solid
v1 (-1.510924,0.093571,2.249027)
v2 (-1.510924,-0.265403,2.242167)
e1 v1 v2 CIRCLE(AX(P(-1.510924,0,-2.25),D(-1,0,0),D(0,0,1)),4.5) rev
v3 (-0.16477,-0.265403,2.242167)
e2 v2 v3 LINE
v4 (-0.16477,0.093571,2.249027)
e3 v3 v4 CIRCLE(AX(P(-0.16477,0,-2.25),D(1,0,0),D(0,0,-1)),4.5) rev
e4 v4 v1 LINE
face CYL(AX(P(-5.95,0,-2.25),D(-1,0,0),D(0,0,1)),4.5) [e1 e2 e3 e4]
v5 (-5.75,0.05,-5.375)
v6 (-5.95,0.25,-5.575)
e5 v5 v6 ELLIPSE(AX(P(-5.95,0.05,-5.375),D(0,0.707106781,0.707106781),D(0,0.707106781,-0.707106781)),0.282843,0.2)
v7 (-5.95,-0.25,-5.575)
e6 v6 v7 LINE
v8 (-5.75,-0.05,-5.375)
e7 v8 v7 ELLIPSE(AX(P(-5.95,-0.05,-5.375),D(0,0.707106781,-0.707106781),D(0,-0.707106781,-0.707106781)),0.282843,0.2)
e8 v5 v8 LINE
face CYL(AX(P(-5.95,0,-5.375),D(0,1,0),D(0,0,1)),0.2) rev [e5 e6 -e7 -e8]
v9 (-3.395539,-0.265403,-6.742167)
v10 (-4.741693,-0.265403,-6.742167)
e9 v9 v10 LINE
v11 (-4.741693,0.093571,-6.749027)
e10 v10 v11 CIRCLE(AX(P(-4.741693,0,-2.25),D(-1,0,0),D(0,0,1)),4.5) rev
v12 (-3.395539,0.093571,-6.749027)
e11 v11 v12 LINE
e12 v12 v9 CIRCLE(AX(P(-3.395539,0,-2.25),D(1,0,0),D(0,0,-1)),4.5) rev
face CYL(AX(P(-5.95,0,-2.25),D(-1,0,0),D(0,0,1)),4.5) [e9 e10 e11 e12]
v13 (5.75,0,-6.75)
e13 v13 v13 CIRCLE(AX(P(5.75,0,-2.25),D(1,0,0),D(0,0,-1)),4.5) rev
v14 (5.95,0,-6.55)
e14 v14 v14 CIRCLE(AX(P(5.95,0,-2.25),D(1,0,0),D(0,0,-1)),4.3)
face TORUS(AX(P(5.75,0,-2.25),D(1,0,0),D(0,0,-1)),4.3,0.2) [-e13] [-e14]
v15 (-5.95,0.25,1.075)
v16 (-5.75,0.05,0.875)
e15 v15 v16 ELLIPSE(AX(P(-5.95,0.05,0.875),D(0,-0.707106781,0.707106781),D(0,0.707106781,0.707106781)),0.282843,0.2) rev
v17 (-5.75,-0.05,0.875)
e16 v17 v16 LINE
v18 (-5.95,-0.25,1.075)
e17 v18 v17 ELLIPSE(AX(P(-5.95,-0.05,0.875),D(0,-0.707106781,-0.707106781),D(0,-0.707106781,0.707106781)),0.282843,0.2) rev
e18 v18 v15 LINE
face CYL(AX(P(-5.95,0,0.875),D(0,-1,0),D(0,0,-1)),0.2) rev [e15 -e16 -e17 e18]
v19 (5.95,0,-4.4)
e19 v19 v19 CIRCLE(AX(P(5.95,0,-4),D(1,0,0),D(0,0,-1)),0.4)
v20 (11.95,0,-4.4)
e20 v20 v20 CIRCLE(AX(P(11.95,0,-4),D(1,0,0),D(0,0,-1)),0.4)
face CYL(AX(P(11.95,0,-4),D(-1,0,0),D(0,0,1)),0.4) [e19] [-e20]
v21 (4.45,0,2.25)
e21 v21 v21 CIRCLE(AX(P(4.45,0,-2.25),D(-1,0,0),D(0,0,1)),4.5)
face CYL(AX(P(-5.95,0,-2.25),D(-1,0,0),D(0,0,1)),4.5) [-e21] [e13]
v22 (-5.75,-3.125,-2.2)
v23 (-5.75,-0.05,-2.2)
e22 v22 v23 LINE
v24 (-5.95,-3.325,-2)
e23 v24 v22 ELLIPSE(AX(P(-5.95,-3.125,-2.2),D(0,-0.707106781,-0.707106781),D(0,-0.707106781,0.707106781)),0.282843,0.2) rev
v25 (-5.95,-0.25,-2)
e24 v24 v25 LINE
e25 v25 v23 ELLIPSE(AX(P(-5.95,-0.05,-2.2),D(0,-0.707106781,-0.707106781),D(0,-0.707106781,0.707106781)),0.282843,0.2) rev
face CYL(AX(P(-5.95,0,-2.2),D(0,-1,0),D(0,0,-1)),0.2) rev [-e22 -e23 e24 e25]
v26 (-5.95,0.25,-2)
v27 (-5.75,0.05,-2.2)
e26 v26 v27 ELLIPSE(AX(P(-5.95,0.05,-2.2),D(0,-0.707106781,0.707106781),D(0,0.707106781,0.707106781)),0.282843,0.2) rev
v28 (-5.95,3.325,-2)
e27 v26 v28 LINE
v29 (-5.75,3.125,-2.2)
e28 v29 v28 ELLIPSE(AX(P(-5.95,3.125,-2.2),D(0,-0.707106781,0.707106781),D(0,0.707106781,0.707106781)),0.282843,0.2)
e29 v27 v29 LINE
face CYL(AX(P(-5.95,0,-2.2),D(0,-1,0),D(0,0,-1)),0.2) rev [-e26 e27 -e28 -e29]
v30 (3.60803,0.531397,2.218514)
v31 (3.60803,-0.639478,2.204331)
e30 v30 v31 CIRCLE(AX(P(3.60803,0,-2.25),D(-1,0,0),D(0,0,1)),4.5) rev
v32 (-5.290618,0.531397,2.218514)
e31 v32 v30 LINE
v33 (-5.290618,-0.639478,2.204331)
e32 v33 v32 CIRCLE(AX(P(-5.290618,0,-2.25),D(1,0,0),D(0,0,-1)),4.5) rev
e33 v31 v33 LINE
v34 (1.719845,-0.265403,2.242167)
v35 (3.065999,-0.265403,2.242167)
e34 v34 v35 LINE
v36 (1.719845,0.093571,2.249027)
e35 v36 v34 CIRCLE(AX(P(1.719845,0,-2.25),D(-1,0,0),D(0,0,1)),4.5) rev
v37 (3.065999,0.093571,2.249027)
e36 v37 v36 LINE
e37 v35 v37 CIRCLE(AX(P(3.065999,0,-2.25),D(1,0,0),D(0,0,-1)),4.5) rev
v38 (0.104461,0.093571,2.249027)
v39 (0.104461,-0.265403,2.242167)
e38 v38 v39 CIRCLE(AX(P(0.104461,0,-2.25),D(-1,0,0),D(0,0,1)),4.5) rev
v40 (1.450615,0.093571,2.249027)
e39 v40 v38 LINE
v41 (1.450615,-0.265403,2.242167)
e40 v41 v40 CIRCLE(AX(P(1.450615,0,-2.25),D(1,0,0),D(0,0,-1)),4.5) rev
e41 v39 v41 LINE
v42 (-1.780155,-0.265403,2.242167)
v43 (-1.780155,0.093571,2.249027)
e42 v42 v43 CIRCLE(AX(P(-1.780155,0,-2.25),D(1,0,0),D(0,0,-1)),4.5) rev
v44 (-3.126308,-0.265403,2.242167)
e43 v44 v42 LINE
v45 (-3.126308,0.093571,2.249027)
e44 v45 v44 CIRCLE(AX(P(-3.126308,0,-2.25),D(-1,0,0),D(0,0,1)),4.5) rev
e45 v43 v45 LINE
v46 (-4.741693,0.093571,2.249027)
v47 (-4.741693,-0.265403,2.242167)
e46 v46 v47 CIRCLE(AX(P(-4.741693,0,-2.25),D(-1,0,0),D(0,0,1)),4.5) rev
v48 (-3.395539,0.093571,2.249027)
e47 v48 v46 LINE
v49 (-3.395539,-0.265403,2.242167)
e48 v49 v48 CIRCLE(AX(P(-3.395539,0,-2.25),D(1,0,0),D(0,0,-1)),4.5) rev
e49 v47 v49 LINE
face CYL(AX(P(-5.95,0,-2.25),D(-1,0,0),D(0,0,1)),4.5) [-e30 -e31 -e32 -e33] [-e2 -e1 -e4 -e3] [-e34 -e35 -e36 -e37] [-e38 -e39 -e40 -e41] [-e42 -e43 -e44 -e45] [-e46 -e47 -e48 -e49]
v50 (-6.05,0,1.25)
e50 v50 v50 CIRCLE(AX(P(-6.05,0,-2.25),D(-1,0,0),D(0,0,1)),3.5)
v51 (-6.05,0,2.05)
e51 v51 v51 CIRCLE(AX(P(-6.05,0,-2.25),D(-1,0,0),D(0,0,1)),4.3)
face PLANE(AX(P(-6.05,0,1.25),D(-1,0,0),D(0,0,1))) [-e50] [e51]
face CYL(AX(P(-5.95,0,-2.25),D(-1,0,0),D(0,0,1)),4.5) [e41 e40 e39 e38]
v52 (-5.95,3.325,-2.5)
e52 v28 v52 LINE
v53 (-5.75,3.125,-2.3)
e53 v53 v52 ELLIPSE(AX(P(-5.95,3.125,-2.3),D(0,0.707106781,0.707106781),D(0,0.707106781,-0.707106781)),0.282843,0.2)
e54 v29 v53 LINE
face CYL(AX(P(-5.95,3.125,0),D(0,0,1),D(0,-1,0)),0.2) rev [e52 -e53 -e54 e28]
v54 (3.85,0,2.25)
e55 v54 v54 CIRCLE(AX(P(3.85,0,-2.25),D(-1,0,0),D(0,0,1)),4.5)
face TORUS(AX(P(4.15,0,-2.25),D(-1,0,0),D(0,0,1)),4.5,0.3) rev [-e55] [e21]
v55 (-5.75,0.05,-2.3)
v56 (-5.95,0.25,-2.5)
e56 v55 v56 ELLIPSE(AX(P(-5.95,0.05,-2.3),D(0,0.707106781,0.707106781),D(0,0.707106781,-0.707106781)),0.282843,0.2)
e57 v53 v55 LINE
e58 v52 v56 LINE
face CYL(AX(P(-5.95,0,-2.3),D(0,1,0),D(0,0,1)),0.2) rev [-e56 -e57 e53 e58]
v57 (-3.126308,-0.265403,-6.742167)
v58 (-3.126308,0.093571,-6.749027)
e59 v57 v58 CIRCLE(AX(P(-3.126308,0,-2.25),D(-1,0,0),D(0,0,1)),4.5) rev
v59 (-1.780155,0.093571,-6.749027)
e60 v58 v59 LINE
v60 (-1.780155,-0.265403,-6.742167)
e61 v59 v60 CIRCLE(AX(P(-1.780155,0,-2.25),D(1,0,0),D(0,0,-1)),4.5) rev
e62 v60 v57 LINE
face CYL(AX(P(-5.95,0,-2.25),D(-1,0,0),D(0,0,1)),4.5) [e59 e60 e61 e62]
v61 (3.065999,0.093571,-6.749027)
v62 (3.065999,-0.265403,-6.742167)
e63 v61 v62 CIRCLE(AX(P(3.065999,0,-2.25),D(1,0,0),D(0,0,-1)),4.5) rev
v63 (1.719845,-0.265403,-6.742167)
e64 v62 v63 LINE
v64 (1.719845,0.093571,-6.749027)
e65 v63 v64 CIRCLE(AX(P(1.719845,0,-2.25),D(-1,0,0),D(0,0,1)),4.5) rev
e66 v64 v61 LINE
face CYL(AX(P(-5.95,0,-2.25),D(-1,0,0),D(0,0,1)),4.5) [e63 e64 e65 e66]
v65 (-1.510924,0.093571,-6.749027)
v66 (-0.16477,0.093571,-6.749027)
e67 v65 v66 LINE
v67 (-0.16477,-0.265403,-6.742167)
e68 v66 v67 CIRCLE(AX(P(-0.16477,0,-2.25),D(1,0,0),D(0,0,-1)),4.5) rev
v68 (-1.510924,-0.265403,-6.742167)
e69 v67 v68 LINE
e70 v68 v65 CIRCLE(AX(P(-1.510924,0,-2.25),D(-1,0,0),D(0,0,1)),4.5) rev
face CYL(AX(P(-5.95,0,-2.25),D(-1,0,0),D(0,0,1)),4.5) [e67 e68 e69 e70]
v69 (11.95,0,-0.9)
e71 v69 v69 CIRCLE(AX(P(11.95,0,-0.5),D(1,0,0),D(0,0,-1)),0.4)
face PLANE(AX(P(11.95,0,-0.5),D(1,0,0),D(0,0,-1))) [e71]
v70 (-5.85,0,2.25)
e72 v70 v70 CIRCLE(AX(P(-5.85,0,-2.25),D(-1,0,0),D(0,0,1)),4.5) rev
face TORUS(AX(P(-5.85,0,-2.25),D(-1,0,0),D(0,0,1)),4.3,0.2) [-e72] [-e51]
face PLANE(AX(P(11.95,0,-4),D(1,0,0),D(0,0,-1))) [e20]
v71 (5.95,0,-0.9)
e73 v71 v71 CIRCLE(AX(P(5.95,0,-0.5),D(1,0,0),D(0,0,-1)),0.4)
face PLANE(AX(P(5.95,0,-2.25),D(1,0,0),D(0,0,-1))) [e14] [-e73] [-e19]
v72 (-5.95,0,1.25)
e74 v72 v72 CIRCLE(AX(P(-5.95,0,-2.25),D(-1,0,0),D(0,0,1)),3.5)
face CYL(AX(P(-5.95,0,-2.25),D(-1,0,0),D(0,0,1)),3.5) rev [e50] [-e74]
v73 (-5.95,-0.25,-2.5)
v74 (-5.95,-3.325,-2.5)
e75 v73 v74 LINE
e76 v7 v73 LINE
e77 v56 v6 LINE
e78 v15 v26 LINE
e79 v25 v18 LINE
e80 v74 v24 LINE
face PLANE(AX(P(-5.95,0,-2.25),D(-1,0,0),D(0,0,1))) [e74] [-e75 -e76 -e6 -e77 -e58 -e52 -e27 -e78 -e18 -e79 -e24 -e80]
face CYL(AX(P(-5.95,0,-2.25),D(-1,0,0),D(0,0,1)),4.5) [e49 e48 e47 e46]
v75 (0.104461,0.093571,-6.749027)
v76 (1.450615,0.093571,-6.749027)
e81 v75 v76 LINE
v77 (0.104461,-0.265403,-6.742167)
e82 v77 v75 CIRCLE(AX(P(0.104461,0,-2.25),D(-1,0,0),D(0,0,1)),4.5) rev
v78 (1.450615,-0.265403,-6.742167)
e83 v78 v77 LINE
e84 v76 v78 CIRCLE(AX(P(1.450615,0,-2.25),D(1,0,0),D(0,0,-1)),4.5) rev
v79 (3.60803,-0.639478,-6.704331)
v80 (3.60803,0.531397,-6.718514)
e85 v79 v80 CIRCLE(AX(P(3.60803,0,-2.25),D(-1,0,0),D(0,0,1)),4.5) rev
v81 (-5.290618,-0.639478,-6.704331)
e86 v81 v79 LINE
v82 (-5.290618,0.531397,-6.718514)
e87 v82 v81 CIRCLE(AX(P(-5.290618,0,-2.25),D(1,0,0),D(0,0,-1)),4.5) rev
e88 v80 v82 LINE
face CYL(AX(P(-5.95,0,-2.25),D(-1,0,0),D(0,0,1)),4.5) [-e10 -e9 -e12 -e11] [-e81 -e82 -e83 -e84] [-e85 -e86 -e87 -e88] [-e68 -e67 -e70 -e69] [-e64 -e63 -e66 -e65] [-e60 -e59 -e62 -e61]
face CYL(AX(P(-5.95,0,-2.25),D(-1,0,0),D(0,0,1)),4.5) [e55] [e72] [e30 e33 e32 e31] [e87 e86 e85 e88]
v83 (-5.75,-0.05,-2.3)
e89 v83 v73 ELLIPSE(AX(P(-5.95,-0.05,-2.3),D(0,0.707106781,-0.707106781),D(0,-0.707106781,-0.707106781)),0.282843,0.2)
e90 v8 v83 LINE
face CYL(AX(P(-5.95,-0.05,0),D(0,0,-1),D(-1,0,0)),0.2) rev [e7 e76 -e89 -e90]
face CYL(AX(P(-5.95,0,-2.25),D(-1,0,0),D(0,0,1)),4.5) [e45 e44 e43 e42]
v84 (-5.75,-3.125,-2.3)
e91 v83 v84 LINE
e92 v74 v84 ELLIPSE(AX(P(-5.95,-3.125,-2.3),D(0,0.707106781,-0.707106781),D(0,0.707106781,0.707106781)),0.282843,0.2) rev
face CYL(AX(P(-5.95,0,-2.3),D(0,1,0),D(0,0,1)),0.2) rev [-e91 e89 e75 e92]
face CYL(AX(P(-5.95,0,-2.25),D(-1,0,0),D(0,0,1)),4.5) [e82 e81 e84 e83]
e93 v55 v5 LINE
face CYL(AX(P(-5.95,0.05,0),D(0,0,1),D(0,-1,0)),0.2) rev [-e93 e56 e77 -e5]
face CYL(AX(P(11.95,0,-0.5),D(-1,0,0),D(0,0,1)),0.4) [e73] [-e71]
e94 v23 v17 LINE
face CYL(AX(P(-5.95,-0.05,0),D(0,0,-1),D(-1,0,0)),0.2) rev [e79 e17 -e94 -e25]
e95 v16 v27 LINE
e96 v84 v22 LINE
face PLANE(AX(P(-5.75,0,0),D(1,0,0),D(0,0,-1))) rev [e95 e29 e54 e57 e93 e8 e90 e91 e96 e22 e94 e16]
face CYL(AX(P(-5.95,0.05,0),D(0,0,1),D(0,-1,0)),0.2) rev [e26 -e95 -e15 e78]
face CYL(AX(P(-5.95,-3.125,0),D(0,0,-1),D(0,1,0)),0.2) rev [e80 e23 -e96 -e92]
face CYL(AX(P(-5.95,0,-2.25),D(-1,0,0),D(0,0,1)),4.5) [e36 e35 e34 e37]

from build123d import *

# Parameters (mm, degrees)
SKETCH6_R           = 0.4
BOSS_EXTRUDE1_DEPTH = 6
CUT_EXTRUDE1_DEPTH  = 0.2
FILLET2_R           = 0.2


with BuildPart() as part:
    # Sketch1 → Revolve1 (revolve)
    with BuildSketch(Plane(origin=(0, 0, 0), x_dir=(1, 0, 0), z_dir=(0, 1, 0))):
        with BuildLine():
            Line((-5.95, -1.25), (-6.05, -1.25))
            Line((-6.05, -1.25), (-6.05, -2.25))
            Line((-6.05, -2.25), (-5.95, -2.25))
            Line((-5.95, -2.25), (3.85, -2.25))
            ThreePointArc((3.85, -2.25), (4.15, -1.95), (4.45, -2.25))
            Line((4.45, -2.25), (5.95, -2.25))
            Line((5.95, -2.25), (5.95, 2.25))
            Line((5.95, 2.25), (-5.95, 2.25))
            Line((-5.95, 2.25), (-5.95, -1.25))
        make_face()
    revolve(axis=Axis((-5.95, 0, -2.25), (1, 0, 0)))

    # Sketch6 → Boss-Extrude1 (add)
    with BuildSketch(Plane(origin=(5.95, 0, 0), x_dir=(0, 0, -1), z_dir=(1, 0, 0))):
        with Locations((0.5, 0)):
            Circle(SKETCH6_R)
        with Locations((4, 0)):
            Circle(SKETCH6_R)
    extrude(amount=BOSS_EXTRUDE1_DEPTH)

    # Sketch8 → Cut-Extrude1 (cut)
    with BuildSketch(Plane.ZY.offset(5.95)):
        Polygon((-2, -0.25), (-2, -3.325), (-2.5, -3.325), (-2.5, -0.25), (-5.575, -0.25), (-5.575, 0.25), (-2.5, 0.25), (-2.5, 3.325), (-2, 3.325), (-2, 0.25), (1.075, 0.25), (1.075, -0.25), align=None)
    extrude(amount=-CUT_EXTRUDE1_DEPTH, mode=Mode.SUBTRACT)

    # Fillet2
    fillet2_edges = [part.edges().sort_by_distance(p)[0] for p in [
        (-5.75, -3.325, -2.25),
        (-5.75, -1.7875, -2.5),
        (-5.75, -0.25, -4.0375),
        (-5.75, 0, -5.575),
        (-5.75, 0.25, -4.0375),
        (-5.75, 1.7875, -2.5),
        (-5.75, 3.325, -2.25),
        (-5.75, 1.7875, -2),
        (-5.75, 0.25, -0.4625),
        (-5.75, 0, 1.075),
        (-5.75, -0.25, -0.4625),
        (-5.75, -1.7875, -2),
        (5.95, 0, -6.75),
        (-6.05, 0, -6.75),
    ]]
    fillet(fillet2_edges, radius=FILLET2_R - 0.0001)  # a hair under: the kernel refuses the full size


solid = part.part
